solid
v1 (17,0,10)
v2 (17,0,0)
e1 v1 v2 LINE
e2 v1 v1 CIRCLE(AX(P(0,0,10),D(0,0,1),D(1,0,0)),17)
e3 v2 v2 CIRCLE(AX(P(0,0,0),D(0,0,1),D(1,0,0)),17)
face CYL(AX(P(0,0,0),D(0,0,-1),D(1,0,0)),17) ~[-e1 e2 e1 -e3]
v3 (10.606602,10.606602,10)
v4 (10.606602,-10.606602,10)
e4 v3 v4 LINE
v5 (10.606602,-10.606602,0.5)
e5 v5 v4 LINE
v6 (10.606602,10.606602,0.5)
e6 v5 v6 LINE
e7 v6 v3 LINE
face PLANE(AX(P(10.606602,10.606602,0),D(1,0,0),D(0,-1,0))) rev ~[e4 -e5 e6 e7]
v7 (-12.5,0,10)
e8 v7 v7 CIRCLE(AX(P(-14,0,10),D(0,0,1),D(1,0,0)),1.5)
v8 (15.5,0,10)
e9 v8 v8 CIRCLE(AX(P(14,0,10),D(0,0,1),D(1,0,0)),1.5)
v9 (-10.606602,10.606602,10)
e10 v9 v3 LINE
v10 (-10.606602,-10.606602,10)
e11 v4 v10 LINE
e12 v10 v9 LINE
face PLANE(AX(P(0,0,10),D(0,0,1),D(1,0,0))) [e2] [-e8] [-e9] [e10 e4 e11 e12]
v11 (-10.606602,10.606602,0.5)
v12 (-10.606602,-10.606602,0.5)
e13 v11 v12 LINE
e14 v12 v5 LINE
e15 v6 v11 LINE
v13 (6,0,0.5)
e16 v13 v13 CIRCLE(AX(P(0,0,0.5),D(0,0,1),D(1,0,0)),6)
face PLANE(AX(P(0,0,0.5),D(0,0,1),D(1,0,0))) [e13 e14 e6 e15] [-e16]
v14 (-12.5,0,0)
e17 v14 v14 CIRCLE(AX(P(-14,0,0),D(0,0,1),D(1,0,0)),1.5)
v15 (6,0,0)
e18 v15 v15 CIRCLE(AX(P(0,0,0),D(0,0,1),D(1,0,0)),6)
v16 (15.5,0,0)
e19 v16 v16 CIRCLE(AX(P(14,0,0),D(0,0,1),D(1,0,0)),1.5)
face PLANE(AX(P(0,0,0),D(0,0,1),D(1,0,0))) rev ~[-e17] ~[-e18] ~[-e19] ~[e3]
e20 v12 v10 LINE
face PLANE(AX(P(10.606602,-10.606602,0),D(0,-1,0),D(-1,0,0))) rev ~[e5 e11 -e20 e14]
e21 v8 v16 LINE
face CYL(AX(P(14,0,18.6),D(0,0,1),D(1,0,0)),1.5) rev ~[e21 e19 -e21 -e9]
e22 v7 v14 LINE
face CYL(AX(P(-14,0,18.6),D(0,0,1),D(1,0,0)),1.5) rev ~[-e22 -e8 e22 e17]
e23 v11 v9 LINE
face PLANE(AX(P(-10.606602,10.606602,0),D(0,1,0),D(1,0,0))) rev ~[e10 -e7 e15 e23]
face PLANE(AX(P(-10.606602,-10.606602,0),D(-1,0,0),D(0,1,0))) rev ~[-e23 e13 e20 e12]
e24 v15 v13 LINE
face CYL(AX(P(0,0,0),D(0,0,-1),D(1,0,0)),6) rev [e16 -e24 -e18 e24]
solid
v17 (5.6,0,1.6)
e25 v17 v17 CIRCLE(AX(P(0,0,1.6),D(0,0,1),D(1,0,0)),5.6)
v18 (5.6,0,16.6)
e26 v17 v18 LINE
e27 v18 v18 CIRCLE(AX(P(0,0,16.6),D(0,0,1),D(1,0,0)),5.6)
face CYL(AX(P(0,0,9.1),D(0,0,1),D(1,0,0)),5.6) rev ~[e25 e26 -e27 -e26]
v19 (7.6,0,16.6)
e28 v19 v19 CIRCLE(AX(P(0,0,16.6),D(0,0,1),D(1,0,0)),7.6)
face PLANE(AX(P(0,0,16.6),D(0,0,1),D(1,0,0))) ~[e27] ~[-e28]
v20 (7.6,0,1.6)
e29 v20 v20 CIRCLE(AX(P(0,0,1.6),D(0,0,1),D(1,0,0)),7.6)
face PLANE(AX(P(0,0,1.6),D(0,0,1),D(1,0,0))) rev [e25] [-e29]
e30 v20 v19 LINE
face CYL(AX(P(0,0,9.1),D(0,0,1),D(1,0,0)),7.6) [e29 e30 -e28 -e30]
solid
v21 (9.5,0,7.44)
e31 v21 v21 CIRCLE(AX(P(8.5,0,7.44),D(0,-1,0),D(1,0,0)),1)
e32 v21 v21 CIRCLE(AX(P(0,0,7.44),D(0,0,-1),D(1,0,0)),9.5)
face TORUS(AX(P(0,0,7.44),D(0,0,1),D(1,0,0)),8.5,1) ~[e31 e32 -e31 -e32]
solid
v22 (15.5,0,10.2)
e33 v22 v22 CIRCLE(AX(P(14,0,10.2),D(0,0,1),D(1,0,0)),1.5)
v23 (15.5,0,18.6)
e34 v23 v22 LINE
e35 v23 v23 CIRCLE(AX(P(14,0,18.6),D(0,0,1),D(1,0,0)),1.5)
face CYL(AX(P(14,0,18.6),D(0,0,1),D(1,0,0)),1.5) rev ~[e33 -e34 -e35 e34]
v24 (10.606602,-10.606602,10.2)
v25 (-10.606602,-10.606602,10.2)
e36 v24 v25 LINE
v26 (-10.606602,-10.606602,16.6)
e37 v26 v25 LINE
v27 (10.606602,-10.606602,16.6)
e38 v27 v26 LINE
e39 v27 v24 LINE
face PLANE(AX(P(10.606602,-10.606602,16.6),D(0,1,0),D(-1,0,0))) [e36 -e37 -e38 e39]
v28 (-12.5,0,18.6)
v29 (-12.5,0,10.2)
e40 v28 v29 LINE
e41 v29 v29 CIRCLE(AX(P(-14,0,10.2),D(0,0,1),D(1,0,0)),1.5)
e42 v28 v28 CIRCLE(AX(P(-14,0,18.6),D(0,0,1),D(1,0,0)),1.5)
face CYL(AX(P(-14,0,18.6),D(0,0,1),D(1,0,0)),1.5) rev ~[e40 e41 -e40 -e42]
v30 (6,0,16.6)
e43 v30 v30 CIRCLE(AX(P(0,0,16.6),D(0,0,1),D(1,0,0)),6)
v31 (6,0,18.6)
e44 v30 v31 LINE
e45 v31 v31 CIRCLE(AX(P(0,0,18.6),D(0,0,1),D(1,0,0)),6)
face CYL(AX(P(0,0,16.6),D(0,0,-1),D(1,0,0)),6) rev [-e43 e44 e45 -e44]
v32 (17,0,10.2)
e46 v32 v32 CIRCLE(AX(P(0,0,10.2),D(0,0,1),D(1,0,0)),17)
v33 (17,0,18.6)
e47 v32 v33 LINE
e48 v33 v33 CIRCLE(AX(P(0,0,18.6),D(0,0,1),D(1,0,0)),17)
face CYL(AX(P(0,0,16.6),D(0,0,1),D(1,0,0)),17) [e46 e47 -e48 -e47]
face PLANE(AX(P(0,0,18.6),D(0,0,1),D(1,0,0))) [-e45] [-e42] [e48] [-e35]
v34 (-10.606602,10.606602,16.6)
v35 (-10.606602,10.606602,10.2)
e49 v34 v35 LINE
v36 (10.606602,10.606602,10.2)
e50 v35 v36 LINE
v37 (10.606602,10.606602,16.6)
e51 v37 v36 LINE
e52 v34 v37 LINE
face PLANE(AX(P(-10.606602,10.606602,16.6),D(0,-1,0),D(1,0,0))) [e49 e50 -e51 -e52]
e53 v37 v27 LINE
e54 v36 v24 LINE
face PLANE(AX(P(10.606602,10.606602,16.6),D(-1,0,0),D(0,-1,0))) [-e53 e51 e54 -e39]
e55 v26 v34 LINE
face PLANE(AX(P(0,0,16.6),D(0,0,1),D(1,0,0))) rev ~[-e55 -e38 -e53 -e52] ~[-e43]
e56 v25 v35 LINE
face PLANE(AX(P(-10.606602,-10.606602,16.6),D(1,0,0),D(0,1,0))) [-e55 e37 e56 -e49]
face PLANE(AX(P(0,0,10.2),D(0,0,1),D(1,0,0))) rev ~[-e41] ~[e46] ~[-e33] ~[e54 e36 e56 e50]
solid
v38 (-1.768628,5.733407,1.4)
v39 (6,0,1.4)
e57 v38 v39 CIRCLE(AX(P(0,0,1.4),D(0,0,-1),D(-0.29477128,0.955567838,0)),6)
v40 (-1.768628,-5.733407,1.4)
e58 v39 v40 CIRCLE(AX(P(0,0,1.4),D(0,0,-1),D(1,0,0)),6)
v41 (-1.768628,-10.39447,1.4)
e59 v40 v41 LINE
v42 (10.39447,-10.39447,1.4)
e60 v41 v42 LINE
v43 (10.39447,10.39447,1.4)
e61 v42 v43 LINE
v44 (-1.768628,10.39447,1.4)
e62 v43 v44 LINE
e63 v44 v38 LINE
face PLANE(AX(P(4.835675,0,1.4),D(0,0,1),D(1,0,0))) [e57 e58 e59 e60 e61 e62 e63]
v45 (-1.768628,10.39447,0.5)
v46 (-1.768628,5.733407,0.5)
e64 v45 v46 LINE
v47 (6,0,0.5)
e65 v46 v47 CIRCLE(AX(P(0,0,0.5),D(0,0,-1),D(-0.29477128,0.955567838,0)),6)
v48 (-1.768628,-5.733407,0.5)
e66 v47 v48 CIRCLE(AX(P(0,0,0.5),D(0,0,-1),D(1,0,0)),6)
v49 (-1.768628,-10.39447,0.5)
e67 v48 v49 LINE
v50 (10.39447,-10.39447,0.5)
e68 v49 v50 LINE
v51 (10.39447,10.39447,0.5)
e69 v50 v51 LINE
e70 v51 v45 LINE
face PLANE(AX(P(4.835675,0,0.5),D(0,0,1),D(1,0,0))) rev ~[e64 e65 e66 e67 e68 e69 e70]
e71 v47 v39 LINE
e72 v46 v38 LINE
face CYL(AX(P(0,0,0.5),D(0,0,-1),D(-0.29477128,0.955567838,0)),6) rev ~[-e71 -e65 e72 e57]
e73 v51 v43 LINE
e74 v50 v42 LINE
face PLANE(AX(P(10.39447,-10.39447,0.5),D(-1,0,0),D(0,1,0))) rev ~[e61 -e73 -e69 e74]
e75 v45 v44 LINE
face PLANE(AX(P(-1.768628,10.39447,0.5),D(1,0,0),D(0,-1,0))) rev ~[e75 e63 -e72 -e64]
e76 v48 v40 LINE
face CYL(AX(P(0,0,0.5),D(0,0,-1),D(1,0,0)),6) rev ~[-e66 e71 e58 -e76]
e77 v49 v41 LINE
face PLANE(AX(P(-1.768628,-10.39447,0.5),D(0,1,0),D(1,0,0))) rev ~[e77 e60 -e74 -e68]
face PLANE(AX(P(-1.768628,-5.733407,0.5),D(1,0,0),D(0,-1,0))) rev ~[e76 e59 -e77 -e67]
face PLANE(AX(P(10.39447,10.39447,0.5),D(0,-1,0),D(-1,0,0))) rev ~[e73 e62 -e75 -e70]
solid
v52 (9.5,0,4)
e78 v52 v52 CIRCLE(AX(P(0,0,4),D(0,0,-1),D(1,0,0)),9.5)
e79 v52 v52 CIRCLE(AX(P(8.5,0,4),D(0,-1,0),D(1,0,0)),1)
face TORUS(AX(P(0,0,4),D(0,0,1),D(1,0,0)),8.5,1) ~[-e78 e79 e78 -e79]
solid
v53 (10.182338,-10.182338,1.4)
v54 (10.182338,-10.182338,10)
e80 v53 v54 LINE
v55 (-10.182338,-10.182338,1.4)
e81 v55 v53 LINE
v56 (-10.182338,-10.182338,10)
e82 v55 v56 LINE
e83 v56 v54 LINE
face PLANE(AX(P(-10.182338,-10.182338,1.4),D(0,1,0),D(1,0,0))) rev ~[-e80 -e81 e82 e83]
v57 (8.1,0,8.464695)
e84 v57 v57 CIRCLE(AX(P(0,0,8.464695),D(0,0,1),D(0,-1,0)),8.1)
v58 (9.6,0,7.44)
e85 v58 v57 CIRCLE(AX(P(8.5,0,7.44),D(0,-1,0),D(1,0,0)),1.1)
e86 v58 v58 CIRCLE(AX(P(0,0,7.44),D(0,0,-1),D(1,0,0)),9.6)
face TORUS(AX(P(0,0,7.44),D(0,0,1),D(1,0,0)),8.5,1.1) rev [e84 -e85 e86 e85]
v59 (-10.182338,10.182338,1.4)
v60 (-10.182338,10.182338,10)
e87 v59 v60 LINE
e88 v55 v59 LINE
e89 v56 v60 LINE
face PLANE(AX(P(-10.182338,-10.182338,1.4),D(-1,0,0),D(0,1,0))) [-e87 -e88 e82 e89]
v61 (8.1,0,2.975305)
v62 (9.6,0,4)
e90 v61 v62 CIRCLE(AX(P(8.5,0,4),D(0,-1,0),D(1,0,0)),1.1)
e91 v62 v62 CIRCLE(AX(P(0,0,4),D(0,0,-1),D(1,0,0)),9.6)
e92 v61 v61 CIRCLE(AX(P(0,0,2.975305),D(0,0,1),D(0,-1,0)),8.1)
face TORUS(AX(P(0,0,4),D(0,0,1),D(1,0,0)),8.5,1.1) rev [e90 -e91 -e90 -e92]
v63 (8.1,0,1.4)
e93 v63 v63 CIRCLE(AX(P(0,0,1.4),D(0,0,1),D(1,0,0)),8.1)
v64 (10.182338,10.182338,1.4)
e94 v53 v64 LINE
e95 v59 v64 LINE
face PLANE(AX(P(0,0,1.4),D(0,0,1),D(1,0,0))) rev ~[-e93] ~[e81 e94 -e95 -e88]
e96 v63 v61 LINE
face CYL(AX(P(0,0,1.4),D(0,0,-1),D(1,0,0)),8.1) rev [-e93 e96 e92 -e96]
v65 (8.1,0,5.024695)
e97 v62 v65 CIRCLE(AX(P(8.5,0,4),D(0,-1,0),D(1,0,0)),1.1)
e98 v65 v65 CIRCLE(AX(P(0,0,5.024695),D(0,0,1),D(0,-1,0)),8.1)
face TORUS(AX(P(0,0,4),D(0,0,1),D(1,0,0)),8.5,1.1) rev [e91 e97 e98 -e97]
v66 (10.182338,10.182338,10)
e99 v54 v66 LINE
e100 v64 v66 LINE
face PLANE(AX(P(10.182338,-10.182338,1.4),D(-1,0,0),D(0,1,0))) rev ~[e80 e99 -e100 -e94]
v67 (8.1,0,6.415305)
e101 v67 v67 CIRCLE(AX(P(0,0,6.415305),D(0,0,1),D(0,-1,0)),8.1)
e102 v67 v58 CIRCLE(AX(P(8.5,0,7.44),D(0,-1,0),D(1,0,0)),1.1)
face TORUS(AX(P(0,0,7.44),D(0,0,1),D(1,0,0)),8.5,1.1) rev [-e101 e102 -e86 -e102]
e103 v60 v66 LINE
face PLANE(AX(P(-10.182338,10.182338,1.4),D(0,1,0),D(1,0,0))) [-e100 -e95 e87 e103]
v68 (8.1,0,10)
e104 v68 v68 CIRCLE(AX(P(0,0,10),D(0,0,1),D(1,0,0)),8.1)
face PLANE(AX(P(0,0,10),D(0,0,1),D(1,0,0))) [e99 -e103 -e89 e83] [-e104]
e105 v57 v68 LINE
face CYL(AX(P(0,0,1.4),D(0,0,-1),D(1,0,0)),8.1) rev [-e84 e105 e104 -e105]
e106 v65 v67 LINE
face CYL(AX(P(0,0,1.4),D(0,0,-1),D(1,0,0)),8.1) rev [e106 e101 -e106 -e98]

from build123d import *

# Parameters (mm, degrees)
F5_R      = 17
F5_W      = 21.2132034356
F5_H      = 21.2132034356
F5_R_2    = 8.1
F5_R_3    = 6
F6_DEPTH  = 0.5
F7_DEPTH  = 10
F9_DEPTH  = 0.9
F10_W     = 20.3646752982
F10_H     = 20.3646752982
F10_R     = 8.1
F11_DEPTH = 8.6
F12_R     = 1.1
F12_R_2   = 1
F14_W     = 2
F14_H     = 15
F18_R     = 17
F18_W     = 21.2132034356
F18_H     = 21.2132034356
F18_R_2   = 8.2
F18_R_3   = 6
F19_DEPTH = 2
F20_DEPTH = 6.4
F21_R     = 1.5
F22_DEPTH = 18.6


# Not quite as in the source:
# - a feature names something its author has since deleted; it is built from what else it names


with BuildPart() as f6:
    # F5 (on Top) → F6 (new body)
    with BuildSketch(Plane.XY):
        Circle(F5_R)
        with BuildLine():
            ThreePointArc((10.6066017178, 10.6066017178), (13.8581929877, 5.7402514855), (15, 0))
            ThreePointArc((15, 0), (13.8581929877, -5.7402514855), (10.6066017178, -10.6066017178))
            ThreePointArc((10.6066017178, -10.6066017178), (0, -15), (-10.6066017178, -10.6066017178))
            ThreePointArc((-10.6066017178, -10.6066017178), (-15, 0), (-10.6066017178, 10.6066017178))
            ThreePointArc((-10.6066017178, 10.6066017178), (0, 15), (10.6066017178, 10.6066017178))
        make_face(mode=Mode.SUBTRACT)
        with BuildLine():
            Line((-10.6066017178, 10.6066017178), (10.6066017178, 10.6066017178))
            ThreePointArc((10.6066017178, 10.6066017178), (0, 15), (-10.6066017178, 10.6066017178))
        make_face()
        with BuildLine():
            Line((-10.6066017178, -10.6066017178), (-10.6066017178, 10.6066017178))
            ThreePointArc((-10.6066017178, 10.6066017178), (-15, 0), (-10.6066017178, -10.6066017178))
        make_face()
        with BuildLine():
            ThreePointArc((10.6066017178, -10.6066017178), (13.8581929877, -5.7402514855), (15, 0))
            ThreePointArc((15, 0), (13.8581929877, 5.7402514855), (10.6066017178, 10.6066017178))
            Line((10.6066017178, 10.6066017178), (10.6066017178, -10.6066017178))
        make_face()
        with BuildLine():
            ThreePointArc((-10.6066017178, -10.6066017178), (0, -15), (10.6066017178, -10.6066017178))
            Line((10.6066017178, -10.6066017178), (-10.6066017178, -10.6066017178))
        make_face()
        Rectangle(F5_W, F5_H)
        Circle(F5_R_2, mode=Mode.SUBTRACT)
        Circle(F5_R_2)
        Circle(F5_R_3, mode=Mode.SUBTRACT)
    extrude(amount=F6_DEPTH)

    # F5 (on Top) → F7 (join)
    with BuildSketch(Plane.XY):
        Circle(F5_R)
        with BuildLine():
            ThreePointArc((10.6066017178, 10.6066017178), (13.8581929877, 5.7402514855), (15, 0))
            ThreePointArc((15, 0), (13.8581929877, -5.7402514855), (10.6066017178, -10.6066017178))
            ThreePointArc((10.6066017178, -10.6066017178), (0, -15), (-10.6066017178, -10.6066017178))
            ThreePointArc((-10.6066017178, -10.6066017178), (-15, 0), (-10.6066017178, 10.6066017178))
            ThreePointArc((-10.6066017178, 10.6066017178), (0, 15), (10.6066017178, 10.6066017178))
        make_face(mode=Mode.SUBTRACT)
        with BuildLine():
            Line((-10.6066017178, -10.6066017178), (-10.6066017178, 10.6066017178))
            ThreePointArc((-10.6066017178, 10.6066017178), (-15, 0), (-10.6066017178, -10.6066017178))
        make_face()
        with BuildLine():
            Line((-10.6066017178, 10.6066017178), (10.6066017178, 10.6066017178))
            ThreePointArc((10.6066017178, 10.6066017178), (0, 15), (-10.6066017178, 10.6066017178))
        make_face()
        with BuildLine():
            ThreePointArc((10.6066017178, -10.6066017178), (13.8581929877, -5.7402514855), (15, 0))
            ThreePointArc((15, 0), (13.8581929877, 5.7402514855), (10.6066017178, 10.6066017178))
            Line((10.6066017178, 10.6066017178), (10.6066017178, -10.6066017178))
        make_face()
        with BuildLine():
            ThreePointArc((-10.6066017178, -10.6066017178), (0, -15), (10.6066017178, -10.6066017178))
            Line((10.6066017178, -10.6066017178), (-10.6066017178, -10.6066017178))
        make_face()
    extrude(amount=F7_DEPTH)


with BuildPart() as f9:
    # F8 (on face) → F9 (new body)
    with BuildSketch(Plane.XY.offset(0.5)):
        with BuildLine():
            Line((10.3944696834, -10.3944696834), (10.3944696834, 10.3944696834))
            Line((10.3944696834, 10.3944696834), (-1.7686276827, 10.3944696834))
            Line((-1.7686276827, 10.3944696834), (-1.7686276827, 5.7334070255))
            ThreePointArc((-1.7686276827, 5.7334070255), (3.5628804291, 4.8276167048), (6, 0))
            ThreePointArc((6, 0), (3.5628804291, -4.8276167048), (-1.7686276827, -5.7334070255))
            Line((-1.7686276827, -5.7334070255), (-1.7686276827, -10.3944696834))
            Line((-1.7686276827, -10.3944696834), (10.3944696834, -10.3944696834))
        make_face()
    extrude(amount=F9_DEPTH)


with BuildPart() as f11:
    # F10 (on face) → F11 (new body)
    with BuildSketch(Plane.XY.offset(1.4)):
        Rectangle(F10_W, F10_H)
        Circle(F10_R, mode=Mode.SUBTRACT)
    extrude(amount=F11_DEPTH)

    # F12 (on Front) → F13 (revolve, cut)
    with BuildSketch(Plane.XZ):
        with Locations((8.5, 7.44)):
            Circle(F12_R)
        with Locations((8.5, 7.44)):
            Circle(F12_R_2, mode=Mode.SUBTRACT)
        with Locations((8.5, 4)):
            Circle(F12_R)
        with Locations((8.5, 4)):
            Circle(F12_R_2, mode=Mode.SUBTRACT)
        with Locations((8.5, 7.44)):
            Circle(F12_R_2)
        with Locations((8.5, 4)):
            Circle(F12_R_2)
    revolve(axis=Axis((0, 0, 11.7573533207), (0, 0, -1)), mode=Mode.SUBTRACT)


with BuildPart() as f15:
    # F14 (on Front) → F15 (revolve)
    with BuildSketch(Plane.XZ):
        with Locations((6.6, 9.1)):
            Rectangle(F14_W, F14_H)
    revolve(axis=Axis((0, 0, 5.7718302123), (0, 0, 1)))


with BuildPart() as f16:
    # F12 (on Front) → F16 (revolve)
    with BuildSketch(Plane.XZ):
        with Locations((8.5, 7.44)):
            Circle(F12_R_2)
    revolve(axis=Axis((0, 0, 11.7573533207), (0, 0, -1)))


with BuildPart() as f16b:
    # F12 (on Front) → F16, piece 2 (revolve)
    with BuildSketch(Plane.XZ):
        with Locations((8.5, 4)):
            Circle(F12_R_2)
    revolve(axis=Axis((0, 0, 11.7573533207), (0, 0, -1)))


with BuildPart() as f19:
    # F18 (on offset) → F19 (new body)
    with BuildSketch(Plane.XY.offset(16.6)):
        Circle(F18_R)
        with BuildLine():
            ThreePointArc((10.6066017178, 10.6066017178), (13.8581929877, 5.7402514855), (15, 0))
            ThreePointArc((15, 0), (13.8581929877, -5.7402514855), (10.6066017178, -10.6066017178))
            ThreePointArc((10.6066017178, -10.6066017178), (0, -15), (-10.6066017178, -10.6066017178))
            ThreePointArc((-10.6066017178, -10.6066017178), (-15, 0), (-10.6066017178, 10.6066017178))
            ThreePointArc((-10.6066017178, 10.6066017178), (0, 15), (10.6066017178, 10.6066017178))
        make_face(mode=Mode.SUBTRACT)
        Rectangle(F18_W, F18_H)
        Circle(F18_R_2, mode=Mode.SUBTRACT)
        Circle(F18_R_2)
        Circle(F18_R_3, mode=Mode.SUBTRACT)
        with BuildLine():
            Line((-10.6066017178, 10.6066017178), (10.6066017178, 10.6066017178))
            ThreePointArc((10.6066017178, 10.6066017178), (0, 15), (-10.6066017178, 10.6066017178))
        make_face()
        with BuildLine():
            Line((-10.6066017178, -10.6066017178), (-10.6066017178, 10.6066017178))
            ThreePointArc((-10.6066017178, 10.6066017178), (-15, 0), (-10.6066017178, -10.6066017178))
        make_face()
        with BuildLine():
            ThreePointArc((-10.6066017178, -10.6066017178), (0, -15), (10.6066017178, -10.6066017178))
            Line((10.6066017178, -10.6066017178), (-10.6066017178, -10.6066017178))
        make_face()
        with BuildLine():
            ThreePointArc((10.6066017178, -10.6066017178), (13.8581929877, -5.7402514855), (15, 0))
            ThreePointArc((15, 0), (13.8581929877, 5.7402514855), (10.6066017178, 10.6066017178))
            Line((10.6066017178, 10.6066017178), (10.6066017178, -10.6066017178))
        make_face()
    extrude(amount=F19_DEPTH)

    # F18 (on offset) → F20 (join)
    with BuildSketch(Plane.XY.offset(16.6)):
        Circle(F18_R)
        with BuildLine():
            ThreePointArc((10.6066017178, 10.6066017178), (13.8581929877, 5.7402514855), (15, 0))
            ThreePointArc((15, 0), (13.8581929877, -5.7402514855), (10.6066017178, -10.6066017178))
            ThreePointArc((10.6066017178, -10.6066017178), (0, -15), (-10.6066017178, -10.6066017178))
            ThreePointArc((-10.6066017178, -10.6066017178), (-15, 0), (-10.6066017178, 10.6066017178))
            ThreePointArc((-10.6066017178, 10.6066017178), (0, 15), (10.6066017178, 10.6066017178))
        make_face(mode=Mode.SUBTRACT)
        with BuildLine():
            ThreePointArc((-10.6066017178, -10.6066017178), (0, -15), (10.6066017178, -10.6066017178))
            Line((10.6066017178, -10.6066017178), (-10.6066017178, -10.6066017178))
        make_face()
        with BuildLine():
            Line((-10.6066017178, -10.6066017178), (-10.6066017178, 10.6066017178))
            ThreePointArc((-10.6066017178, 10.6066017178), (-15, 0), (-10.6066017178, -10.6066017178))
        make_face()
        with BuildLine():
            ThreePointArc((10.6066017178, -10.6066017178), (13.8581929877, -5.7402514855), (15, 0))
            ThreePointArc((15, 0), (13.8581929877, 5.7402514855), (10.6066017178, 10.6066017178))
            Line((10.6066017178, 10.6066017178), (10.6066017178, -10.6066017178))
        make_face()
        with BuildLine():
            Line((-10.6066017178, 10.6066017178), (10.6066017178, 10.6066017178))
            ThreePointArc((10.6066017178, 10.6066017178), (0, 15), (-10.6066017178, 10.6066017178))
        make_face()
    extrude(amount=-F20_DEPTH)


with BuildPart() as f22_tool:
    # F21 (on face) → F22 (new body, through all)
    with BuildSketch(Plane.XY.offset(18.6)):
        with Locations((-14, 0)):
            Circle(F21_R)
        with Locations((14, 0)):
            Circle(F21_R)
    extrude(amount=-F22_DEPTH)


with BuildPart() as f6_1:
    add(f6.part)

    # F22: cut by f22_tool
    add(f22_tool.part, mode=Mode.SUBTRACT)


with BuildPart() as f19_1:
    add(f19.part)

    # F22: cut by f22_tool
    add(f22_tool.part, mode=Mode.SUBTRACT)


solid = Compound([f9.part, f11.part, f15.part, f16.part, f16b.part, f6_1.part, f19_1.part])
